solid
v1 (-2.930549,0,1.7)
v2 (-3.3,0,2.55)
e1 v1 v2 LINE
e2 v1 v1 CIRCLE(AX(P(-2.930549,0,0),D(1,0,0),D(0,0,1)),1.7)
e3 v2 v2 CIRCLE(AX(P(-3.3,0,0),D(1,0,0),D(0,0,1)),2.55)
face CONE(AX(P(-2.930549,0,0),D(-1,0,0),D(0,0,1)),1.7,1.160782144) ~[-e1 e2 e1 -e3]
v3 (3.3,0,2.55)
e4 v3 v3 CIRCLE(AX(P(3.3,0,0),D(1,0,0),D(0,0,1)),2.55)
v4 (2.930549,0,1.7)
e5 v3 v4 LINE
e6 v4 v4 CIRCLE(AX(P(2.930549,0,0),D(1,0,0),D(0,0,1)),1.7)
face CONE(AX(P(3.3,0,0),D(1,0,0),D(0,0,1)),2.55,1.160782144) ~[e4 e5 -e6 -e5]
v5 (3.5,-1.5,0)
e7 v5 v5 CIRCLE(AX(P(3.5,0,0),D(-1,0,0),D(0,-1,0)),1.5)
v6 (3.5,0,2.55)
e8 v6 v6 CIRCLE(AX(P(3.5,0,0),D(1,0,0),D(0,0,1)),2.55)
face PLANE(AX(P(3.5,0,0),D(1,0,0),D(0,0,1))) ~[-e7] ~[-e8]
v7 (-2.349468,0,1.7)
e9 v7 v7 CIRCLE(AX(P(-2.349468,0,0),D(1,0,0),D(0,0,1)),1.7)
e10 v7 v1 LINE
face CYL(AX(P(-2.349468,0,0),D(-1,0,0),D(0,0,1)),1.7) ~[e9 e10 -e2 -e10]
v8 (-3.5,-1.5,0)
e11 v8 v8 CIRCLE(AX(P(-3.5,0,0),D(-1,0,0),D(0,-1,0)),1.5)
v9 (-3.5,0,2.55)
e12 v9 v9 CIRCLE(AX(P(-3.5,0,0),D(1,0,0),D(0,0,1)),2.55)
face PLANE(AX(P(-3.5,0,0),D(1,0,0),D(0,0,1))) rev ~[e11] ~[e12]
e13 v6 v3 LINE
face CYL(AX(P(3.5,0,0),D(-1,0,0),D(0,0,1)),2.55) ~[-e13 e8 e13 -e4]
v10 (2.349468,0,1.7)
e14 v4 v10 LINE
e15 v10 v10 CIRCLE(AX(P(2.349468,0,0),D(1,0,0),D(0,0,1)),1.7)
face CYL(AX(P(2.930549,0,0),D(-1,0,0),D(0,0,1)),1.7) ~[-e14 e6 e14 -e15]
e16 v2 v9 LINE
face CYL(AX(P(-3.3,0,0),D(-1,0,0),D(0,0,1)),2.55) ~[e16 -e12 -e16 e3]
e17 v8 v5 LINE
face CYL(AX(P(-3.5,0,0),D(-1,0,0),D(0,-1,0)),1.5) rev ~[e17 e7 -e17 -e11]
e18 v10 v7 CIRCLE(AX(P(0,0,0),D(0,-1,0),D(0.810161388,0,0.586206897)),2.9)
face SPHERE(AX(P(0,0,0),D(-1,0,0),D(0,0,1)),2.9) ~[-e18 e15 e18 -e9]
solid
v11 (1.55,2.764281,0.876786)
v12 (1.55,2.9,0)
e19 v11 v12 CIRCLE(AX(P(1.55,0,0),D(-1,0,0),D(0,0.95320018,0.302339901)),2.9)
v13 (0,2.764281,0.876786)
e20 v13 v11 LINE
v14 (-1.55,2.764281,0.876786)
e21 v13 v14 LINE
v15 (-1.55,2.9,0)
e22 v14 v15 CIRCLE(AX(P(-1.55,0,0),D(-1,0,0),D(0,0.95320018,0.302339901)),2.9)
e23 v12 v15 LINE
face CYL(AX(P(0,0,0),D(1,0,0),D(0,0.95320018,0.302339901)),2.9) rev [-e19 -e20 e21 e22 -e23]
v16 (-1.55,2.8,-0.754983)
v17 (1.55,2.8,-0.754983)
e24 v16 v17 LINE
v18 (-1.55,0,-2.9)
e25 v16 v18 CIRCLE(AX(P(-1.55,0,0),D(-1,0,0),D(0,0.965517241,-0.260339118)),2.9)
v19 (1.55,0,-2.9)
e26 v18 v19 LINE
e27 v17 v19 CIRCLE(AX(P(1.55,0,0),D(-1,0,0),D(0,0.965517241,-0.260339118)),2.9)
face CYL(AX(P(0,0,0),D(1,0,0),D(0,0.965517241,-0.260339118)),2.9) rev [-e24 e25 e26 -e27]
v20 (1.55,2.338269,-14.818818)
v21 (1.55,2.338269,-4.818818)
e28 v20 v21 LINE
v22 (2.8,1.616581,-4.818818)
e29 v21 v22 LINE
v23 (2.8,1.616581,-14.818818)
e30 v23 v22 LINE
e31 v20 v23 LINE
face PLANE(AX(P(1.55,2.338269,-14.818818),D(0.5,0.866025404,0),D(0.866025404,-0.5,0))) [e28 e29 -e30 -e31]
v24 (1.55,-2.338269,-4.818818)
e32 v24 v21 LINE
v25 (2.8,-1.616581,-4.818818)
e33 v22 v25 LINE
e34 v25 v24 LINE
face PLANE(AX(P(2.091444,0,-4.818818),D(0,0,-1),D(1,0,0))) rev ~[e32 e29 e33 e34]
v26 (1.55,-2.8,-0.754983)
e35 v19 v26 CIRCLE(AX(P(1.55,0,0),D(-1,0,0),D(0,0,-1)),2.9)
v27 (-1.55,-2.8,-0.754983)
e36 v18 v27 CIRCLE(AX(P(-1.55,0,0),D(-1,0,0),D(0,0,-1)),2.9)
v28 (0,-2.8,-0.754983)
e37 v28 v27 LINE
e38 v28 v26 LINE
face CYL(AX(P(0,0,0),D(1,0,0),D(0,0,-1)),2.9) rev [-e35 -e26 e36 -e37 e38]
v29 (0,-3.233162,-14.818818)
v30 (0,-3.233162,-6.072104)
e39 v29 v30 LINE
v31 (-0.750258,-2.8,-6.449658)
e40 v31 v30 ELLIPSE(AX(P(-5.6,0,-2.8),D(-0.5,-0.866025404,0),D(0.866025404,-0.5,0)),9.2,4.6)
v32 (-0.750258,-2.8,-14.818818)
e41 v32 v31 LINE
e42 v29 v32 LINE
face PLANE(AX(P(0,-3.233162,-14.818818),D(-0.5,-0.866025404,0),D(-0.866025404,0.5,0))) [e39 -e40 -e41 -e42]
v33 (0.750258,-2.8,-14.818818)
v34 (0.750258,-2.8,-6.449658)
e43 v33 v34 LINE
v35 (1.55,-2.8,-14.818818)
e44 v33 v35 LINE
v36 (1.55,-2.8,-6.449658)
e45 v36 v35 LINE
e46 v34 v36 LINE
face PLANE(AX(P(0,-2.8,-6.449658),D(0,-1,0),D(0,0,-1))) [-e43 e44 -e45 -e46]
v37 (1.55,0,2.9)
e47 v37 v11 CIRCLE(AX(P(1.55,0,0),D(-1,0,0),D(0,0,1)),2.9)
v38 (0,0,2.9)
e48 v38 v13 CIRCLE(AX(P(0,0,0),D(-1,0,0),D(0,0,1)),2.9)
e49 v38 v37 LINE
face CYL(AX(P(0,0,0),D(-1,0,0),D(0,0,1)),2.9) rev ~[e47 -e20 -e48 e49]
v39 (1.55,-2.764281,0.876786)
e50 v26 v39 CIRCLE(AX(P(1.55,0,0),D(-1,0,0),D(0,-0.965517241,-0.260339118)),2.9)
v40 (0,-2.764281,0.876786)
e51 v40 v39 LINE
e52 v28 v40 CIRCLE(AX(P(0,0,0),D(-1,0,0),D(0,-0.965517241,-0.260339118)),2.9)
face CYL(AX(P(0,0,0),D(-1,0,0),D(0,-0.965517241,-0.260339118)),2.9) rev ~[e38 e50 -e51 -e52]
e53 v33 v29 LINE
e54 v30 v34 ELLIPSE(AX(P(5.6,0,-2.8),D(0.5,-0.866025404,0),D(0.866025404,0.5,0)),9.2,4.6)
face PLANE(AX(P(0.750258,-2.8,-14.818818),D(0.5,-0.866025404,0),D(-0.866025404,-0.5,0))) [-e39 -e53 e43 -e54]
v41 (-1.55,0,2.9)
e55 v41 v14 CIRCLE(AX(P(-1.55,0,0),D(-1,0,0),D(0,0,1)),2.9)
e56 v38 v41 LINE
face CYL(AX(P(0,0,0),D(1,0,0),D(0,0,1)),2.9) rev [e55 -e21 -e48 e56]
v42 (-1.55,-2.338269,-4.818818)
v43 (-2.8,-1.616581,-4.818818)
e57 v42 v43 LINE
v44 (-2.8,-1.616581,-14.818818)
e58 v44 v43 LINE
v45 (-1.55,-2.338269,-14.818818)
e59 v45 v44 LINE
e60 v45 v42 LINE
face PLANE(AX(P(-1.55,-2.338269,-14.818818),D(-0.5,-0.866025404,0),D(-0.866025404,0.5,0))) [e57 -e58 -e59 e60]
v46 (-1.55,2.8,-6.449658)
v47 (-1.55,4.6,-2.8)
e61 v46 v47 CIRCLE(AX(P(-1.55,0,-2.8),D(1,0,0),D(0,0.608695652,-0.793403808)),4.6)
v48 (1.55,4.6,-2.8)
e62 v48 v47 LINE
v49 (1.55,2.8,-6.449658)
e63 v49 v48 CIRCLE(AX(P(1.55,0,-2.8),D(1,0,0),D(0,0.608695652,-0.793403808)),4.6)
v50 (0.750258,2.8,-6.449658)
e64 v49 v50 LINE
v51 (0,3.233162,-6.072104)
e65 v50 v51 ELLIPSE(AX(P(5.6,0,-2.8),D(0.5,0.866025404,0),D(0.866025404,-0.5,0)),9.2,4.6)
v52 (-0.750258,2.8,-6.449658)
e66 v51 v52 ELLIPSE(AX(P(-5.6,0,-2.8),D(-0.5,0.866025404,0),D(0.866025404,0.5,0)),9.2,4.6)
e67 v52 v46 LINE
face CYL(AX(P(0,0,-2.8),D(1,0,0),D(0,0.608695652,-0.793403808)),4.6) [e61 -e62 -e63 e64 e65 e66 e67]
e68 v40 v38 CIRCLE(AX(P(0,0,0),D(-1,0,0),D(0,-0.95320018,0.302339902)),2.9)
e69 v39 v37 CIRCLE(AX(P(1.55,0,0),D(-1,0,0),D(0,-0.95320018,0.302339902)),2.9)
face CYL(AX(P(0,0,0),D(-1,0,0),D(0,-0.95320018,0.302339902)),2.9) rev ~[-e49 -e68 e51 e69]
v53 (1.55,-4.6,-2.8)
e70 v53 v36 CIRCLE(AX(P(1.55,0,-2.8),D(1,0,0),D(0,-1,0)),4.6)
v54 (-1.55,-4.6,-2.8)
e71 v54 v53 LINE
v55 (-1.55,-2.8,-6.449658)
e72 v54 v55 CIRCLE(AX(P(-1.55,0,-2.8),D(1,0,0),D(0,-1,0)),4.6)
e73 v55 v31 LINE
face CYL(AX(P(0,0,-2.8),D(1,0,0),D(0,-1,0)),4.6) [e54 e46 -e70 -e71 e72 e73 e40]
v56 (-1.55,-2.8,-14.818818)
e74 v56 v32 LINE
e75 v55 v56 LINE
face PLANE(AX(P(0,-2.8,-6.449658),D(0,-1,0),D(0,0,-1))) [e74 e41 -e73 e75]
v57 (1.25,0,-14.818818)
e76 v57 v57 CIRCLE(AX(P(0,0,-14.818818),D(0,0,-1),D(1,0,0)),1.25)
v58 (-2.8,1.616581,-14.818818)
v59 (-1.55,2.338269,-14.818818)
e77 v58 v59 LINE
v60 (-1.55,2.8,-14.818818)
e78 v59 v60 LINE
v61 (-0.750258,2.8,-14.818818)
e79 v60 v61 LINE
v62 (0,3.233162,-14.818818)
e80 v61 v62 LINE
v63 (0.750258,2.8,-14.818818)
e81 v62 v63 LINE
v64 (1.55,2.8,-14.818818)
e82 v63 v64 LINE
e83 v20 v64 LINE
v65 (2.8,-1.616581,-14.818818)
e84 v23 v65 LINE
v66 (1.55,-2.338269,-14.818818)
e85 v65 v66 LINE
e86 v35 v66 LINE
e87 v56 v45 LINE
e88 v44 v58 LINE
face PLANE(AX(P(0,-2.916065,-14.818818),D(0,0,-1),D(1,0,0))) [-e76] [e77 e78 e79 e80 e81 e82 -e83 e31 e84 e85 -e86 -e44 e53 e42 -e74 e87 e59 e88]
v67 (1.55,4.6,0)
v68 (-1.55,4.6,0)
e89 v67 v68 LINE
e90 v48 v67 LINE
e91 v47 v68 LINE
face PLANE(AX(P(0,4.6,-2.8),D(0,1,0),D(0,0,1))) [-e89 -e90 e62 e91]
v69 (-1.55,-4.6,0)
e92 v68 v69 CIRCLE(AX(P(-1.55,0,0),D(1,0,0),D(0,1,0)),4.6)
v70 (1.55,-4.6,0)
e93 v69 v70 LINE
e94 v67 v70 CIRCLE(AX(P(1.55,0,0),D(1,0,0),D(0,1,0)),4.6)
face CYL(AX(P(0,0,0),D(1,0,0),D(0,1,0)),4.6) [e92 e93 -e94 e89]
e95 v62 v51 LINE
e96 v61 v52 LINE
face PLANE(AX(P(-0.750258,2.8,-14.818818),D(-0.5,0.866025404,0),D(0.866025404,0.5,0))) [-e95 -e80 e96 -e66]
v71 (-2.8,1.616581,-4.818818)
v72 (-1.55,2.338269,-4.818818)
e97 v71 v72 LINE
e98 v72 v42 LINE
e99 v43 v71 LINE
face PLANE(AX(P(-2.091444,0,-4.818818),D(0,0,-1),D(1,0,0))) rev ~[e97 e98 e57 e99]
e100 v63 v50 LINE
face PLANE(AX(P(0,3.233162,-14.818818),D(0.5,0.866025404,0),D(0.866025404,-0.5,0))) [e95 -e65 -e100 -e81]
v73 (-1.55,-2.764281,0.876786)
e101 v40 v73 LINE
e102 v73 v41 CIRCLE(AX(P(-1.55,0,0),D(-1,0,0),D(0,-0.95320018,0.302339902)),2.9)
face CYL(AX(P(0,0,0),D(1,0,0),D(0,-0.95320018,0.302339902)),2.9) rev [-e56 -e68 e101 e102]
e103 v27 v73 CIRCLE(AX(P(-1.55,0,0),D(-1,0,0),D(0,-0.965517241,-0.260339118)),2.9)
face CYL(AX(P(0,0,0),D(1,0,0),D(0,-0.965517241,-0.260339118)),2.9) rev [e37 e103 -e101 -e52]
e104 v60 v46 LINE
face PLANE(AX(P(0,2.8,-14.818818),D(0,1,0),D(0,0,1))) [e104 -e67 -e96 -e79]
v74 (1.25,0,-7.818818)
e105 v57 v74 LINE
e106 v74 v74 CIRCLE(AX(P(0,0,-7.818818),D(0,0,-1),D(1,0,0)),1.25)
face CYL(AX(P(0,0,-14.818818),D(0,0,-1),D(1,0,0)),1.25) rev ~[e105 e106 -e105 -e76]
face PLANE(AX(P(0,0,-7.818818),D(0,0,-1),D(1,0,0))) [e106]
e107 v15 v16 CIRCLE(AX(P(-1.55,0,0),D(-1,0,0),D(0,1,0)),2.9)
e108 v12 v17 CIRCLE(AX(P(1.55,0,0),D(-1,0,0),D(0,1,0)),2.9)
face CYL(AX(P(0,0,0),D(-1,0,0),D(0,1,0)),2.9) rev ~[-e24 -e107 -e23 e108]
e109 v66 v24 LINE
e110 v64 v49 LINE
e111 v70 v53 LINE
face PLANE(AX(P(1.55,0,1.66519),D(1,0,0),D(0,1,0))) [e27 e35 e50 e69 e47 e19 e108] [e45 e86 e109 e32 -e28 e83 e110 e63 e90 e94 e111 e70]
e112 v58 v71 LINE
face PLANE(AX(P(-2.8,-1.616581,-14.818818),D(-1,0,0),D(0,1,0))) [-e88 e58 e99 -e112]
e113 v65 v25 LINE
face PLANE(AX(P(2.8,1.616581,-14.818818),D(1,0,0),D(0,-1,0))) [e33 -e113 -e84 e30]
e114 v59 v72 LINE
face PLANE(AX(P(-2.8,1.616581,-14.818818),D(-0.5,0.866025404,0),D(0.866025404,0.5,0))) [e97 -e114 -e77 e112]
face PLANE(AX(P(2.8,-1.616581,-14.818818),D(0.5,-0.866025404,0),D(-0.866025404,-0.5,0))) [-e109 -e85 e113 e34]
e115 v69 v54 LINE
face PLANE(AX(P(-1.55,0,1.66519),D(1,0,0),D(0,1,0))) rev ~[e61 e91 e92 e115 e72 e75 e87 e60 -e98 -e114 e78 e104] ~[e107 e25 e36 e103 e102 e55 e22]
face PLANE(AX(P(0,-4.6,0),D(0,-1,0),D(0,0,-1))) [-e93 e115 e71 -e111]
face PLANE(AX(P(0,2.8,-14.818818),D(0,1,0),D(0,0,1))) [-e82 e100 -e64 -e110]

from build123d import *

# Parameters (mm, degrees)
F2_R     = 1.5
F3_DEPTH = 7.001
F5_DEPTH = 1.55
F7_DEPTH = 10
F6_R     = 1.25
F8_DEPTH = 7


# Not quite as in the source:
# - a feature names something its author has since deleted; it is built from what else it names


with BuildPart() as f1:
    # F0 (on Front) → F1 (revolve)
    with BuildSketch(Plane.XZ):
        with BuildLine():
            ThreePointArc((2.3494680249, 1.7), (2.7589361421, 0.8934603315), (2.9, 0))
            Line((2.9, 0), (3.5, 0))
            Line((3.5, 0), (3.5, 2.55))
            Line((3.5, 2.55), (3.3, 2.55))
            Line((3.3, 2.55), (2.9305491433, 1.7))
            Line((2.9305491433, 1.7), (2.3494680249, 1.7))
        make_face()
        with BuildLine():
            Line((-2.9, 0), (2.9, 0))
            ThreePointArc((2.9, 0), (2.7589361421, 0.8934603315), (2.3494680249, 1.7))
            ThreePointArc((2.3494680249, 1.7), (0, 2.9), (-2.3494680249, 1.7))
            ThreePointArc((-2.3494680249, 1.7), (-2.7589361421, 0.8934603315), (-2.9, 0))
        make_face()
        with BuildLine():
            Line((-3.5, 0), (-2.9, 0))
            ThreePointArc((-2.9, 0), (-2.7589361421, 0.8934603315), (-2.3494680249, 1.7))
            Line((-2.3494680249, 1.7), (-2.9305491433, 1.7))
            Line((-2.9305491433, 1.7), (-3.3, 2.55))
            Line((-3.3, 2.55), (-3.5, 2.55))
            Line((-3.5, 2.55), (-3.5, 0))
        make_face()
    revolve(axis=Axis((1.75, 0, 0), (1, 0, 0)))

    # F2 (on face) → F3 (cut, through all)
    with BuildSketch(Plane(origin=(-3.5, 0, 0), x_dir=(0, -1, 0), z_dir=(-1, 0, 0))):
        Circle(F2_R)
    extrude(amount=-F3_DEPTH, mode=Mode.SUBTRACT)


with BuildPart() as f5:
    # F4 (on Right) → F5 (new body, symmetric)
    with BuildSketch(Plane.YZ):
        with BuildLine():
            ThreePointArc((4.38178046, -1.4), (4.5451177166, -0.708452498), (4.6, 0))
            ThreePointArc((4.6, 0), (0, 4.6), (-4.6, 0))
            ThreePointArc((-4.6, 0), (-4.5451177166, -0.708452498), (-4.38178046, -1.4))
            ThreePointArc((-4.38178046, -1.4), (-3.7499980255, -0.1358838598), (-2.7642805233, 0.8767857143))
            ThreePointArc((-2.7642805233, 0.8767857143), (-1.7127932491, 2.3401579617), (0, 2.9))
            ThreePointArc((0, 2.9), (1.7127932491, 2.3401579617), (2.7642805233, 0.8767857143))
            ThreePointArc((2.7642805233, 0.8767857143), (3.7499980255, -0.1358838598), (4.38178046, -1.4))
        make_face()
        with BuildLine():
            ThreePointArc((-2.8, -3.6496575182), (-3.7629419848, -2.6458018858), (-4.38178046, -1.4))
            ThreePointArc((-4.38178046, -1.4), (-4.5451177166, -2.091547502), (-4.6, -2.8))
            ThreePointArc((-4.6, -2.8), (-4.1255302689, -4.8346989949), (-2.8, -6.4496575182))
            Line((-2.8, -6.4496575182), (-2.8, -3.6496575182))
        make_face()
        with BuildLine():
            ThreePointArc((-4.38178046, -1.4), (-4.5451177166, -0.708452498), (-4.6, 0))
            Line((-4.6, 0), (-4.6, -2.8))
            ThreePointArc((-4.6, -2.8), (-4.5451177166, -2.091547502), (-4.38178046, -1.4))
        make_face()
        with BuildLine():
            Line((4.6, -2.8), (4.6, 0))
            ThreePointArc((4.6, 0), (4.5451177166, -0.708452498), (4.38178046, -1.4))
            ThreePointArc((4.38178046, -1.4), (4.5451177166, -2.091547502), (4.6, -2.8))
        make_face()
        with BuildLine():
            ThreePointArc((-2.7642805233, 0.8767857143), (-3.7499980255, -0.1358838598), (-4.38178046, -1.4))
            ThreePointArc((-4.38178046, -1.4), (-3.7629419848, -2.6458018858), (-2.8, -3.6496575182))
            Line((-2.8, -3.6496575182), (-2.8, -0.7549834435))
            ThreePointArc((-2.8, -0.7549834435), (-2.8993054481, 0.0634658849), (-2.7642805233, 0.8767857143))
        make_face()
        with BuildLine():
            Line((2.8, -14.8188183084), (2.8, -6.4496575182))
            ThreePointArc((2.8, -6.4496575182), (0, -7.4), (-2.8, -6.4496575182))
            Line((-2.8, -6.4496575182), (-2.8, -14.8188183084))
            Line((-2.8, -14.8188183084), (0, -14.8188183084))
            Line((0, -14.8188183084), (2.8, -14.8188183084))
        make_face()
        with BuildLine():
            Line((2.8, -6.4496575182), (2.8, -3.6496575182))
            ThreePointArc((2.8, -3.6496575182), (0, -4.6), (-2.8, -3.6496575182))
            Line((-2.8, -3.6496575182), (-2.8, -6.4496575182))
            ThreePointArc((-2.8, -6.4496575182), (0, -7.4), (2.8, -6.4496575182))
        make_face()
        with BuildLine():
            ThreePointArc((-2.8, -3.6496575182), (0, -4.6), (2.8, -3.6496575182))
            Line((2.8, -3.6496575182), (2.8, -0.7549834435))
            ThreePointArc((2.8, -0.7549834435), (1.7635968947, -2.3021133754), (0, -2.9))
            ThreePointArc((0, -2.9), (-1.7635968947, -2.3021133754), (-2.8, -0.7549834435))
            Line((-2.8, -0.7549834435), (-2.8, -3.6496575182))
        make_face()
        with BuildLine():
            ThreePointArc((4.6, -2.8), (4.5451177166, -2.091547502), (4.38178046, -1.4))
            ThreePointArc((4.38178046, -1.4), (3.7629419848, -2.6458018858), (2.8, -3.6496575182))
            Line((2.8, -3.6496575182), (2.8, -6.4496575182))
            ThreePointArc((2.8, -6.4496575182), (4.1255302689, -4.8346989949), (4.6, -2.8))
        make_face()
        with BuildLine():
            ThreePointArc((2.8, -3.6496575182), (3.7629419848, -2.6458018858), (4.38178046, -1.4))
            ThreePointArc((4.38178046, -1.4), (3.7499980255, -0.1358838598), (2.7642805233, 0.8767857143))
            ThreePointArc((2.7642805233, 0.8767857143), (2.865869285, 0.4436138425), (2.9, 0))
            ThreePointArc((2.9, 0), (2.8748913023, -0.3807886553), (2.8, -0.7549834435))
            Line((2.8, -0.7549834435), (2.8, -3.6496575182))
        make_face()
    extrude(amount=F5_DEPTH, both=True)

    # F6 (on face) → F7 (join)
    with BuildSketch(Plane(origin=(0, 0, -14.8188183084), x_dir=(1, 0, 0), z_dir=(0, 0, -1))):
        Polygon((-2.8, 1.6165807537), (-2.8, -1.6165807537), (-1.55, -2.3382685902), (-1.55, 2.3382685902), align=None)
        Polygon((0, 3.2331615075), (-0.7502577388, 2.8), (0.7502577388, 2.8), align=None)
        Polygon((1.55, 2.3382685902), (1.55, -2.3382685902), (2.8, -1.6165807537), (2.8, 1.6165807537), align=None)
        Polygon((0.7502577388, -2.8), (-0.7502577388, -2.8), (0, -3.2331615075), align=None)
    extrude(amount=-F7_DEPTH)

    # F6 (on face) → F8 (cut)
    with BuildSketch(Plane(origin=(0, 0, -14.8188183084), x_dir=(1, 0, 0), z_dir=(0, 0, -1))):
        Circle(F6_R)
    extrude(amount=-F8_DEPTH, mode=Mode.SUBTRACT)


solid = Compound([f1.part, f5.part])
